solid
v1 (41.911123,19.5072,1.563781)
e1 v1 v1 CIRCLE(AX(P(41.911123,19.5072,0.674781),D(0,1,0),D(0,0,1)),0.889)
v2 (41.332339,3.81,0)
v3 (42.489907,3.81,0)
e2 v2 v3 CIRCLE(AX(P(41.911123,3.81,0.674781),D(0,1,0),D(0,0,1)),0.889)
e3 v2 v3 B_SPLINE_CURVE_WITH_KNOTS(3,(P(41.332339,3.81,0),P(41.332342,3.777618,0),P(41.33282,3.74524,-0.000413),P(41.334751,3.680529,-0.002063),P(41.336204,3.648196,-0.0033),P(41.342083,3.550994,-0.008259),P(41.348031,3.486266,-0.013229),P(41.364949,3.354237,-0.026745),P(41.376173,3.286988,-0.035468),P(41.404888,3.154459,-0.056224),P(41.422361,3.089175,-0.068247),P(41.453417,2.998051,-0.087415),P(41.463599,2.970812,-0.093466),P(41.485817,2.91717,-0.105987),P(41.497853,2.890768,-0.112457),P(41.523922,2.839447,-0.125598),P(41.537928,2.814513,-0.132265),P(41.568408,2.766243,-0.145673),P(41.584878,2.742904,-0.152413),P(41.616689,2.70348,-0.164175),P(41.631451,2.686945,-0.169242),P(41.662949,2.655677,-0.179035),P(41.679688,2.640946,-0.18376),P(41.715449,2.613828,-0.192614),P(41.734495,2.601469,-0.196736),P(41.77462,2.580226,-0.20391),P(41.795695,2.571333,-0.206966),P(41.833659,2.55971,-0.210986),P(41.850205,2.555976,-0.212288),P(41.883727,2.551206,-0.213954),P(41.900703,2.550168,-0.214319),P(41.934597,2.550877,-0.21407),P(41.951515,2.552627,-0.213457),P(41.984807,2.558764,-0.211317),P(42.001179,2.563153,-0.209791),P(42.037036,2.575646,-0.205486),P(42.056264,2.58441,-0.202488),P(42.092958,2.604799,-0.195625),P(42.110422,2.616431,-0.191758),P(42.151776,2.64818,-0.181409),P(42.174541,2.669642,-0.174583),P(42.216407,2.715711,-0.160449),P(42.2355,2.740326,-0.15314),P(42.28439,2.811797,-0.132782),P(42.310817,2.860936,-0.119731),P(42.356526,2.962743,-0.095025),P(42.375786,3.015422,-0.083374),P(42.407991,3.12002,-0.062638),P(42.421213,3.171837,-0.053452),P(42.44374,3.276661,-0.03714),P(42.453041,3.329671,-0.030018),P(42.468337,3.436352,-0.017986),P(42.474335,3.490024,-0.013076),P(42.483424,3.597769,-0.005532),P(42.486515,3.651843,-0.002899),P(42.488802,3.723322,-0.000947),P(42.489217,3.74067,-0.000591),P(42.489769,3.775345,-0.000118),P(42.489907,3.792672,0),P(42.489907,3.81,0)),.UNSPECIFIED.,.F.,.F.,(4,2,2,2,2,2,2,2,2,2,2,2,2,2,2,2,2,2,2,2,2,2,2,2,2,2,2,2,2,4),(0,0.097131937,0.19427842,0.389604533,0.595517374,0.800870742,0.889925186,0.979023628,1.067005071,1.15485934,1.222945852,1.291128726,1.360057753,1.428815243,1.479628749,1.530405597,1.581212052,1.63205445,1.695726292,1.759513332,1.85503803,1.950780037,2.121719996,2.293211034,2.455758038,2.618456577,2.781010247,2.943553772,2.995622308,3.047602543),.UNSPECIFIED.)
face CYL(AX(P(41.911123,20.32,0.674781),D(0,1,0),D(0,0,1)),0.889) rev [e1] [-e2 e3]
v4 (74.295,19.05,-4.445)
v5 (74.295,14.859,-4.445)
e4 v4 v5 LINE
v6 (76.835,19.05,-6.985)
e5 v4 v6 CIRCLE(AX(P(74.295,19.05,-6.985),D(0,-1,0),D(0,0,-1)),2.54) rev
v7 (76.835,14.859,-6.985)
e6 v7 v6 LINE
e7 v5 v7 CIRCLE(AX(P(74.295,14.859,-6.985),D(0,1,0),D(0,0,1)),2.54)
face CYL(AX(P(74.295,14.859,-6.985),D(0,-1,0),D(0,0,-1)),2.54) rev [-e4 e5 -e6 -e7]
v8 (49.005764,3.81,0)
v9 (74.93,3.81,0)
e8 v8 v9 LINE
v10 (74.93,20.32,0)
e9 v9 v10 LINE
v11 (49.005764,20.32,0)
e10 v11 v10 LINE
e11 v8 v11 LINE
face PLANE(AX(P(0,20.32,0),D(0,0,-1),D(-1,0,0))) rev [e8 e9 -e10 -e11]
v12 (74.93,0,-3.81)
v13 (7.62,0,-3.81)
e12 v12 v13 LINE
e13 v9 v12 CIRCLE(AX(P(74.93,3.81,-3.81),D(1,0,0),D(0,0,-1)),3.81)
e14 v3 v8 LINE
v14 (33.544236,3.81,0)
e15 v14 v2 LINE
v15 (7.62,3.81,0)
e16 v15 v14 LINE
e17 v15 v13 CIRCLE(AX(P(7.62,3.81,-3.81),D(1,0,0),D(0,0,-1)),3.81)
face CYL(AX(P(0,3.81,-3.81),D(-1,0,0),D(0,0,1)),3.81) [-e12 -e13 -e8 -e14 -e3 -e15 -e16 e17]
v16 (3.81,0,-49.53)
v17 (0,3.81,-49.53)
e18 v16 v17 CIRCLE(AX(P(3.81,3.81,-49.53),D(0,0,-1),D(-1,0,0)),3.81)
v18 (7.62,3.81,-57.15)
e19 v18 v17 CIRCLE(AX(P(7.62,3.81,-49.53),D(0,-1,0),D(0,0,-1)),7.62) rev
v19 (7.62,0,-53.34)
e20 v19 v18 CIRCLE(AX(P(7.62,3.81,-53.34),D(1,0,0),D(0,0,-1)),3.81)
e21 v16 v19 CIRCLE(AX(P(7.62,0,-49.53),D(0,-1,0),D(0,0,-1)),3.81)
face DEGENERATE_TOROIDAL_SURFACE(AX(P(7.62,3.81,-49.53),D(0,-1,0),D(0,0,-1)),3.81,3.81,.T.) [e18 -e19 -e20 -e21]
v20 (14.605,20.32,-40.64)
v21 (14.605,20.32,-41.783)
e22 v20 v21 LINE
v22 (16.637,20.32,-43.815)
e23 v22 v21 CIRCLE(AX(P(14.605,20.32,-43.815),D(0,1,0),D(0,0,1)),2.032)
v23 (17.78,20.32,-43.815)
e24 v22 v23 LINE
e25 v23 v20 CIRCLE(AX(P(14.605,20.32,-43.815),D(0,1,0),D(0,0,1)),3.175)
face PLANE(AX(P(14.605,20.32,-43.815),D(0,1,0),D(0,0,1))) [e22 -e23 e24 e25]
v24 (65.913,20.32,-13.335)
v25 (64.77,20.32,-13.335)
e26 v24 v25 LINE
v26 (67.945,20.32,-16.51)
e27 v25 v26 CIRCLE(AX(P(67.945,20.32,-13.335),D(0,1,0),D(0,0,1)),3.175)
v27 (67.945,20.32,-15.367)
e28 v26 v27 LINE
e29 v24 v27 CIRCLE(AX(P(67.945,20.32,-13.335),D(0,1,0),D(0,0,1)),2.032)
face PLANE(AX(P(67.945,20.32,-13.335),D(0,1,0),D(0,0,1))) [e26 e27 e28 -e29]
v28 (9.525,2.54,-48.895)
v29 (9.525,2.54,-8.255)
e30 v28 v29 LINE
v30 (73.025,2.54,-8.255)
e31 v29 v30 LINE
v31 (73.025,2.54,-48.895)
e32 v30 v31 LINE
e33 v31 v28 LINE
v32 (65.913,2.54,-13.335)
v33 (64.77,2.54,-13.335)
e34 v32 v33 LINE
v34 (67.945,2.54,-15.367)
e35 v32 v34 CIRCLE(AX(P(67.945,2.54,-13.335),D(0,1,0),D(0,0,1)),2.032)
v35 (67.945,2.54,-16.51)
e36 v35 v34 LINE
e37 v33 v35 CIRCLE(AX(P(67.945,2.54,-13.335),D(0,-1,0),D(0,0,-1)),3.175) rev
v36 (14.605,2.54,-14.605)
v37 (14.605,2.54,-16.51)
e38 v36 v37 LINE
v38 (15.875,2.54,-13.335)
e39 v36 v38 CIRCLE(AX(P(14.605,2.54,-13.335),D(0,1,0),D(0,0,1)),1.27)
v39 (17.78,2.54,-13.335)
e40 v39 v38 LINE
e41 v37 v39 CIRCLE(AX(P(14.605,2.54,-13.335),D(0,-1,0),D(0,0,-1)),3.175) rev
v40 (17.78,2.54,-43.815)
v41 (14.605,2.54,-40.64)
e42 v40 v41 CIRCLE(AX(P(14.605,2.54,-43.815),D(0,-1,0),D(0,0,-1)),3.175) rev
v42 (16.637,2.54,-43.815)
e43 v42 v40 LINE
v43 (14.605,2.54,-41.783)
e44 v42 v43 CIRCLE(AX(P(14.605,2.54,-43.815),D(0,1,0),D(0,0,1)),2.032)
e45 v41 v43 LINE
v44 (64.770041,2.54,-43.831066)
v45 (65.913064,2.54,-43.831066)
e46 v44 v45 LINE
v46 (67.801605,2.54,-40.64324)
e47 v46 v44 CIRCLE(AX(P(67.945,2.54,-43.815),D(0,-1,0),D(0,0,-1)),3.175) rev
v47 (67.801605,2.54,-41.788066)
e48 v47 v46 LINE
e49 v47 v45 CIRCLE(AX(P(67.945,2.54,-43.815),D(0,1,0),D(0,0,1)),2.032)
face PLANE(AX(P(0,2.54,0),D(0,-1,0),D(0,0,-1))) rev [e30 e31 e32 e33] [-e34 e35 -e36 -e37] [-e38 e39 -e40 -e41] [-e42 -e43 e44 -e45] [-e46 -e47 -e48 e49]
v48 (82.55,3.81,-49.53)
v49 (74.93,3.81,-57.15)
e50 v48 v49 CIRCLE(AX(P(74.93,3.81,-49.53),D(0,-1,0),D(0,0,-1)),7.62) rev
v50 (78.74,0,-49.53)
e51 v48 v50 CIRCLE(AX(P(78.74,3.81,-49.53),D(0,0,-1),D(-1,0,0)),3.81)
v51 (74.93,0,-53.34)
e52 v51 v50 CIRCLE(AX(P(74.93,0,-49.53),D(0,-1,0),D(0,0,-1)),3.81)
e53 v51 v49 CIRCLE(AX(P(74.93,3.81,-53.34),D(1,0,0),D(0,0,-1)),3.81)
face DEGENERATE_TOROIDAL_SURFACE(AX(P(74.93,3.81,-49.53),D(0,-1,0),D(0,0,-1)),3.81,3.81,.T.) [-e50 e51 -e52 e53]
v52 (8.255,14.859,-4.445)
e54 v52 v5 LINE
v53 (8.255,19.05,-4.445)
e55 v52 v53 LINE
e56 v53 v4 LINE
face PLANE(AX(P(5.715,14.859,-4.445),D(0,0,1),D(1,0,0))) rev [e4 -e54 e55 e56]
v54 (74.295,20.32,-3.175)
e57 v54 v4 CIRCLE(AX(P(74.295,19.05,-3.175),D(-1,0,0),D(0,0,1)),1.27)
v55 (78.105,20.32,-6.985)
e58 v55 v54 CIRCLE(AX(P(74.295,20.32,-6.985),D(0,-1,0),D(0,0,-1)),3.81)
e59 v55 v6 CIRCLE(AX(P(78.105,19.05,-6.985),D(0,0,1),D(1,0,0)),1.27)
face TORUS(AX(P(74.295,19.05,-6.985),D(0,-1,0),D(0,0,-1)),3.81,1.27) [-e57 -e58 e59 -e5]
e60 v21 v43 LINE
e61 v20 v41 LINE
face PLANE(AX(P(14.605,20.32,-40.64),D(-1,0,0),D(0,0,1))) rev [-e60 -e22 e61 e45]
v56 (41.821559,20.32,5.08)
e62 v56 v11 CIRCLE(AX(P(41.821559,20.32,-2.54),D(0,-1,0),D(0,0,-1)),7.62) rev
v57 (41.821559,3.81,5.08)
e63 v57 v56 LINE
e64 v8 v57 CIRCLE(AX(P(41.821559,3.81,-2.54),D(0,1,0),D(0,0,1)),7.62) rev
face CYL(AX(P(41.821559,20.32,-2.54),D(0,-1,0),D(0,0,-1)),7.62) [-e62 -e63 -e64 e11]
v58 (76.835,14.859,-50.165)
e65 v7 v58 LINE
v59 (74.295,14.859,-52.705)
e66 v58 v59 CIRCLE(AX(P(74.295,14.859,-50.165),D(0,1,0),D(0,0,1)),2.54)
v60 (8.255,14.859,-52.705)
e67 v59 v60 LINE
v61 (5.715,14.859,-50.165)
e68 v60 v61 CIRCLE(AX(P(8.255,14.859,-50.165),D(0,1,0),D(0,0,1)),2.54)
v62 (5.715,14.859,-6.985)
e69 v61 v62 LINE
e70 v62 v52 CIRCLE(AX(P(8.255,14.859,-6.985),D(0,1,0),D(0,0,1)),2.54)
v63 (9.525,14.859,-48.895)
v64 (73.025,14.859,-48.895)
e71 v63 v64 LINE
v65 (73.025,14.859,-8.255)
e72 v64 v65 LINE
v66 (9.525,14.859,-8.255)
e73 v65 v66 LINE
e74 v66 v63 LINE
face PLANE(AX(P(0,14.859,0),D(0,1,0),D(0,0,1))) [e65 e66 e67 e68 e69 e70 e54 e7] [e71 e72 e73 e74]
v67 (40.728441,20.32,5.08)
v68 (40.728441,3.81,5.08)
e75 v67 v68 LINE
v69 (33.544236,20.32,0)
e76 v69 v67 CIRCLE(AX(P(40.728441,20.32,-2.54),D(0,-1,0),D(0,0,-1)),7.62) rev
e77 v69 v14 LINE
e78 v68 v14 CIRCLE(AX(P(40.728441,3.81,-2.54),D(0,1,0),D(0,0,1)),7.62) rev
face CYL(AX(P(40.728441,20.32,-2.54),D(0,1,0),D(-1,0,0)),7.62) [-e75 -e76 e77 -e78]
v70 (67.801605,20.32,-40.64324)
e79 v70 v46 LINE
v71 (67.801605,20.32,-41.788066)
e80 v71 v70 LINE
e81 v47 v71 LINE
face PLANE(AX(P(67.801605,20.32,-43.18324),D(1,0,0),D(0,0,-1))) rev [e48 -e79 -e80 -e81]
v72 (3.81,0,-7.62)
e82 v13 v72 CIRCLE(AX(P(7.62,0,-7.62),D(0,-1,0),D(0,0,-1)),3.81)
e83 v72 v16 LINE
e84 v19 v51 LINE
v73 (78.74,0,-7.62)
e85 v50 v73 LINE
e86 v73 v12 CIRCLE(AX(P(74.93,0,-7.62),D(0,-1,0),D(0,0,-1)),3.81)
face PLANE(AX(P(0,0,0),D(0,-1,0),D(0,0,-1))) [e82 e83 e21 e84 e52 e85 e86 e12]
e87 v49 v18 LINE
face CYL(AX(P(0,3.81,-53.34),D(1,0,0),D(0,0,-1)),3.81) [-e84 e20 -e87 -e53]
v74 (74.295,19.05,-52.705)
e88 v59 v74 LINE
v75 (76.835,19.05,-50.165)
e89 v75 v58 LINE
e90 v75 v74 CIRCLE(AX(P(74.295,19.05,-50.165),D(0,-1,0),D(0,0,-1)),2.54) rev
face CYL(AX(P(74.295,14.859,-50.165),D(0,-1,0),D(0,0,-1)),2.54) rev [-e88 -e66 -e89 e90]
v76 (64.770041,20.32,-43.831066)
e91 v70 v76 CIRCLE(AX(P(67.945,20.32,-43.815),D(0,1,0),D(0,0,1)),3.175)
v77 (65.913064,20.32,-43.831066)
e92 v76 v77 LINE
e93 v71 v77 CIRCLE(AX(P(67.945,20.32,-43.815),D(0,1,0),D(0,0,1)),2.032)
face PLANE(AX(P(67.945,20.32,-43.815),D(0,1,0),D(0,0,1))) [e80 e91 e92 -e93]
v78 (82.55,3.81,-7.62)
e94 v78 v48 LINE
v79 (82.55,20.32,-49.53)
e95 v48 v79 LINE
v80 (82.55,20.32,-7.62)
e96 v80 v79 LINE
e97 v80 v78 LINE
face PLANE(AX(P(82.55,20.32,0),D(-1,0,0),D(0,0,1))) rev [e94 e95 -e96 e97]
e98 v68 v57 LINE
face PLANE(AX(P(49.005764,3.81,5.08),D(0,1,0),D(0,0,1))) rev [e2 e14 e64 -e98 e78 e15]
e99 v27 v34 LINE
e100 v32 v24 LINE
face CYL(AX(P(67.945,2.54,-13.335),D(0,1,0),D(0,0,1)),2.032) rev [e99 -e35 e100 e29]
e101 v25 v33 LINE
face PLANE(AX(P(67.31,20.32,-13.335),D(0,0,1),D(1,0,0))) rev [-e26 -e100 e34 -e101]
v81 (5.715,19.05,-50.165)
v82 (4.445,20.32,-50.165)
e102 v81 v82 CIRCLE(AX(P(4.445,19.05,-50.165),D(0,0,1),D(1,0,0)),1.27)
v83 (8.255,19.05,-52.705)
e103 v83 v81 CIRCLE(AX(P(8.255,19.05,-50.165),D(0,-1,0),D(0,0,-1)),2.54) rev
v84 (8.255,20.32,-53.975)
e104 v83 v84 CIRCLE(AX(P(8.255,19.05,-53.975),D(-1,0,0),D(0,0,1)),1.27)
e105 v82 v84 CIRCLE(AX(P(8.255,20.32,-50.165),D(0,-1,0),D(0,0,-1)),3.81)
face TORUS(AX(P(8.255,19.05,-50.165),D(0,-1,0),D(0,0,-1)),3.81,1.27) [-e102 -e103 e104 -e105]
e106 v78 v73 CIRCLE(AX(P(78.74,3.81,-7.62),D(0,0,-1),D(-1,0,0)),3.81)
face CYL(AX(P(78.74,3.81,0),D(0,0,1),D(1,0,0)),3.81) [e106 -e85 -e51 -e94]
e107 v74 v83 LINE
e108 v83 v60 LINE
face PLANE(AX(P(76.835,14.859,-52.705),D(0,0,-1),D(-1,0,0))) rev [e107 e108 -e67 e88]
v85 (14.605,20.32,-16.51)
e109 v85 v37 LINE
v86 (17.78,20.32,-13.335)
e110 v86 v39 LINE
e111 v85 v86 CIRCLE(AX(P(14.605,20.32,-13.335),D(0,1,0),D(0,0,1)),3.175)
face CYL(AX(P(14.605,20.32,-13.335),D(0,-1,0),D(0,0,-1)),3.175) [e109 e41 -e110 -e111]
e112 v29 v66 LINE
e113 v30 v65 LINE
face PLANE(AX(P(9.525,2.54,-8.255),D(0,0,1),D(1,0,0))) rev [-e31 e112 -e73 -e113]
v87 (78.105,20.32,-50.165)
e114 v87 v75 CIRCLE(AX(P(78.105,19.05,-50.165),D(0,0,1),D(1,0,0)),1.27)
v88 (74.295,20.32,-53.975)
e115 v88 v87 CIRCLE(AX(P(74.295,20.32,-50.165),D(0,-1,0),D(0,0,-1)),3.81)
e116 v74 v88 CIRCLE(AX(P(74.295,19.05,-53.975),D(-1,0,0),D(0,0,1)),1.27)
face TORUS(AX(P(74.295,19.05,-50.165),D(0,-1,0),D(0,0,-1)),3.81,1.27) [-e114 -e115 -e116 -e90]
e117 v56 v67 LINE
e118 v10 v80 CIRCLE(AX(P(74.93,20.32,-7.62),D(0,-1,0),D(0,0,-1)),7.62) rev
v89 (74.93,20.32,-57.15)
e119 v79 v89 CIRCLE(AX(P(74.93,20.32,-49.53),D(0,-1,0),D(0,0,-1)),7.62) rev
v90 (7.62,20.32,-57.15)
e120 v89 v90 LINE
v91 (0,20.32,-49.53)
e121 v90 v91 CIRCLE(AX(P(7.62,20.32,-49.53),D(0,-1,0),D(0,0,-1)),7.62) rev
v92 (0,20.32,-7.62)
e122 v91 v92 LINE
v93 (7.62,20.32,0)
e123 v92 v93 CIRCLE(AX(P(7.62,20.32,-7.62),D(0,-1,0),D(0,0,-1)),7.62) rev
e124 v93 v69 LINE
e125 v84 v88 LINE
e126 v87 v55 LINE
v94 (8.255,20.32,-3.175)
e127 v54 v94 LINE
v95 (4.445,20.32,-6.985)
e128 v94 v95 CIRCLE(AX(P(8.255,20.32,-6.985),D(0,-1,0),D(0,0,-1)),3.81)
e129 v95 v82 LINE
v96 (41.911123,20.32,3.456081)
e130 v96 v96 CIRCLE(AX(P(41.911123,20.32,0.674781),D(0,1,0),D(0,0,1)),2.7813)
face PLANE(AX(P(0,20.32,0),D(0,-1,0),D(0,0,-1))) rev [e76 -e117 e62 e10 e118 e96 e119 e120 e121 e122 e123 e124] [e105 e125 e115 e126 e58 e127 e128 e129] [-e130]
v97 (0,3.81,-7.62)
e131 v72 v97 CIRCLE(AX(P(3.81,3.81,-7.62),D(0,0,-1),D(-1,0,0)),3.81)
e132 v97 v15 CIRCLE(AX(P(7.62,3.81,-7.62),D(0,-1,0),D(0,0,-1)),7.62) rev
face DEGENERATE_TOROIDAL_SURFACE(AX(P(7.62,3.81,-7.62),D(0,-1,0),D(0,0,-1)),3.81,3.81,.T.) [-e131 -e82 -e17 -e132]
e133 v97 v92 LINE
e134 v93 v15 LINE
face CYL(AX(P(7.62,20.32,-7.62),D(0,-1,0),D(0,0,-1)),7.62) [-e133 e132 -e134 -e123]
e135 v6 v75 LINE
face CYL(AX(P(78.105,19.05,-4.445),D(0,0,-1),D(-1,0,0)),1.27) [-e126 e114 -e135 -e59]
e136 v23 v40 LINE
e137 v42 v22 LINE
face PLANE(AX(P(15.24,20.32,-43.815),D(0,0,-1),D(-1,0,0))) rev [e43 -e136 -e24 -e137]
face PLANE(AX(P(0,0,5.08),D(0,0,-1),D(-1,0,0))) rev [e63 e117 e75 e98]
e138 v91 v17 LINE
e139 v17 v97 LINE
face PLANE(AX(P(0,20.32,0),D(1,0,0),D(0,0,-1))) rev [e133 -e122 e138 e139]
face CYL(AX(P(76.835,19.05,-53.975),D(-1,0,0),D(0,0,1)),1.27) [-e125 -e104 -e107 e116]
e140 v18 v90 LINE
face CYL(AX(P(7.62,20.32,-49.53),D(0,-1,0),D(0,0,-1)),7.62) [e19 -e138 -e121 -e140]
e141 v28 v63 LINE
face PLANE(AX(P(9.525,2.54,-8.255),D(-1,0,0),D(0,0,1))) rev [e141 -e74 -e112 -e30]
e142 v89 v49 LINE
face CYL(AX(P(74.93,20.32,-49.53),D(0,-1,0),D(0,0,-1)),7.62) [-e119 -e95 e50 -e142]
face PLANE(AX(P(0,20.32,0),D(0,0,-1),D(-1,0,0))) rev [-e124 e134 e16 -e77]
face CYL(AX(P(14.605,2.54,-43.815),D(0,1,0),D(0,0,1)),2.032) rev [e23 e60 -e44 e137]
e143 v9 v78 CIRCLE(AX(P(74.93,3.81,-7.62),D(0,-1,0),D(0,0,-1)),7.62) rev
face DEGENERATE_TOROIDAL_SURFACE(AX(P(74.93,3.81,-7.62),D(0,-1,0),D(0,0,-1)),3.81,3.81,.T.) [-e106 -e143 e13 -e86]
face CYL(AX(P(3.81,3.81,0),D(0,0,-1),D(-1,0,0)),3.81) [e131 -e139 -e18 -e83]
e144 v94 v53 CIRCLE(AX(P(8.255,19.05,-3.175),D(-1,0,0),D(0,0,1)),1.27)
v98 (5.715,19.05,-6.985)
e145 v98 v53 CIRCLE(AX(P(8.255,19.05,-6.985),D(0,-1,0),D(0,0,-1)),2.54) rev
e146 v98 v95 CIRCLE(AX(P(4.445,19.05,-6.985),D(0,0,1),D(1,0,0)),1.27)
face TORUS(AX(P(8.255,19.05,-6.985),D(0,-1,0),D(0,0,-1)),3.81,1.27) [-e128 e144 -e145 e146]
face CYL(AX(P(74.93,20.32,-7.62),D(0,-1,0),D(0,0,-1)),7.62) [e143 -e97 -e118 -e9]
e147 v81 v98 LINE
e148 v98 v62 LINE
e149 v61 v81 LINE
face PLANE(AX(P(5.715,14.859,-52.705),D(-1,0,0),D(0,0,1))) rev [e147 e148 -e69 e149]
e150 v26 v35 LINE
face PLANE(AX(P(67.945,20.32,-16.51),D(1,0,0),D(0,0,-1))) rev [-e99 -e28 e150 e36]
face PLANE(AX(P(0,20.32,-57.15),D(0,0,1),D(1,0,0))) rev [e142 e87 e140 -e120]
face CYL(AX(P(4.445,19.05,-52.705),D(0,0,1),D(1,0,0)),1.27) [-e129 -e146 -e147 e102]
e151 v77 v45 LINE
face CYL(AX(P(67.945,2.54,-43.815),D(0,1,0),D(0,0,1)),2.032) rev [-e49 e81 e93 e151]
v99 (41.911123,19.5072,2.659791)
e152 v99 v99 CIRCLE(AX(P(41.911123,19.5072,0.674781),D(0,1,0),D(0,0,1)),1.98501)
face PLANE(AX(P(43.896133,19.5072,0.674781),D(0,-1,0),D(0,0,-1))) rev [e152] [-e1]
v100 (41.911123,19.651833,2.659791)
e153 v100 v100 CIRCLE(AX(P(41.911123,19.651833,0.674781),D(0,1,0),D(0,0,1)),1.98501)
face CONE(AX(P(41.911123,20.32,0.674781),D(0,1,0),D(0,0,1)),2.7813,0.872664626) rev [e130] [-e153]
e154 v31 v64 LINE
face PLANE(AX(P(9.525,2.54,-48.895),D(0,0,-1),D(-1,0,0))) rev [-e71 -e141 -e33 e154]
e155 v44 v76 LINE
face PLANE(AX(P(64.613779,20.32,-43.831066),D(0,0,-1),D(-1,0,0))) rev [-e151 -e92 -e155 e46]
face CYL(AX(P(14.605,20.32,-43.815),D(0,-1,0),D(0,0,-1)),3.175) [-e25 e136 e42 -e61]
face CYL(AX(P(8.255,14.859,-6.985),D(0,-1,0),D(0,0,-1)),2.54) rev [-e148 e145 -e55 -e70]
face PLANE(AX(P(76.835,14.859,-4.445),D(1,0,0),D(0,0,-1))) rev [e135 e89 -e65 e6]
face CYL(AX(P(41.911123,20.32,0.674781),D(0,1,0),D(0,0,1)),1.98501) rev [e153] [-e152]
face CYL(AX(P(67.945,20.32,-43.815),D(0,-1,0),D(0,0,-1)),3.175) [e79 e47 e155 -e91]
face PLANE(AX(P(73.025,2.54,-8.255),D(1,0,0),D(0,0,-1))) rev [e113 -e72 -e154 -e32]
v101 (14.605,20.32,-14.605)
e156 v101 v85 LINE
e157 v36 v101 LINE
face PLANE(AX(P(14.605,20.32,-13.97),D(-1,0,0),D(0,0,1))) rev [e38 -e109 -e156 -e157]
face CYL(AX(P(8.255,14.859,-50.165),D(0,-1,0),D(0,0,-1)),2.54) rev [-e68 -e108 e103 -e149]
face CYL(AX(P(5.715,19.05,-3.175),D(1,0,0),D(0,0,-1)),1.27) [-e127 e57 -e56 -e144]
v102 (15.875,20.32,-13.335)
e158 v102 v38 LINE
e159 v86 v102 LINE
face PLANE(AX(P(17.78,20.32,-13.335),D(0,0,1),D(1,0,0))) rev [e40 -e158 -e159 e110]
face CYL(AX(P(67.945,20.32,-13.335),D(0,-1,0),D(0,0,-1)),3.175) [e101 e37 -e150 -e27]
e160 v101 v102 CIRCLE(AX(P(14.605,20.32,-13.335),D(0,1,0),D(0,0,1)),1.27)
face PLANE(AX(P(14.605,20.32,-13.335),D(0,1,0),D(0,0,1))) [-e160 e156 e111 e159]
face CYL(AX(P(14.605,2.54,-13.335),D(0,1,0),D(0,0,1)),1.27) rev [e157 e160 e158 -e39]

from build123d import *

# Parameters (mm, degrees)
SKETCH1_W               = 82.55
SKETCH1_H               = 57.15
BOSS_EXTRUDE1_DEPTH     = 20.32
FILLET2_R               = 7.62
FILLET3_R               = 3.81
SKETCH2_W               = 63.5
SKETCH2_H               = 40.64
CUT_EXTRUDE1_DEPTH      = 17.78
SKETCH9_W               = 15.46152766
SKETCH9_H               = 16.51
BOSS_EXTRUDE5_DEPTH     = 5.08
FILLET10_R              = 7.62
SKETCH7_W               = 71.12
SKETCH7_H               = 48.26
CUT_EXTRUDE4_DEPTH      = 5.461
FILLET12_R              = 2.54
FILLET13_R              = 1.27
SKETCH5_R               = 3.175
BOSS_EXTRUDE6_DEPTH     = 17.78
SKETCH11_R              = 1.27
SKETCH11_R_2            = 2.032
CUT_EXTRUDE5_DEPTH      = 17.78
CUT_EXTRUDE_THIN1_DEPTH = 102.964471319


with BuildPart() as part:
    # Sketch1 → Boss-Extrude1 (new body)
    with BuildSketch(Plane(origin=(0, 0, 0), x_dir=(1, 0, 0), z_dir=(0, 1, 0))):
        with Locations((41.275, 28.575)):
            Rectangle(SKETCH1_W, SKETCH1_H)
    extrude(amount=BOSS_EXTRUDE1_DEPTH)

    # Fillet2
    fillet2_edges = [part.edges().sort_by_distance(p)[0] for p in [
        (0, 10.16, -57.15),
        (82.55, 10.16, -57.15),
        (82.55, 10.16, 0),
        (0, 10.16, 0),
    ]]
    fillet(fillet2_edges, radius=FILLET2_R)

    # Fillet3
    fillet3_edges = [part.edges().sort_by_distance(p)[0] for p in [
        (41.275, 0, -57.15),
        (0, 0, -28.575),
        (82.55, 0, -28.575),
        (41.275, 0, 0),
        (2.231846327, 0, -54.918153673),
        (2.231846327, 0, -2.231846327),
        (80.318153673, 0, -2.231846327),
        (80.318153673, 0, -54.918153673),
    ]]
    fillet(fillet3_edges, radius=FILLET3_R)

    # Sketch2 → Cut-Extrude1 (cut)
    with BuildSketch(Plane(origin=(0, 20.32, 0), x_dir=(1, 0, 0), z_dir=(0, 1, 0))):
        with Locations((41.275, 28.575)):
            Rectangle(SKETCH2_W, SKETCH2_H)
    extrude(amount=-CUT_EXTRUDE1_DEPTH, mode=Mode.SUBTRACT)

    # Sketch9 → Boss-Extrude5 (add)
    with BuildSketch(Plane.XY):
        with Locations((41.275, 12.065)):
            Rectangle(SKETCH9_W, SKETCH9_H)
    extrude(amount=BOSS_EXTRUDE5_DEPTH)

    # Fillet10
    # the kernel refuses this fillet: 7.62 mm, written as the material it takes off along each edge
    with BuildSketch(Plane(origin=(49.00576383, -14.150512242, 5.08), x_dir=(-1, 0, 0), z_dir=(0, 1, 0))) as fillet10_piece_1:
        with BuildLine():
            CenterArc((7.184204897, -7.62), FILLET10_R, 90, 70.528779366)
            Line((0, -5.08), (-0.143684098, -5.0292))
            ThreePointArc((-0.143684098, -5.0292), (-0.1524, -2.54), (-0.1524, 0))
            Line((-0.1524, 0), (0, 0.1524))
            Line((0, 0.1524), (7.184204897, 0.1524))
            Line((7.184204897, 0.1524), (7.184204897, 0))
        make_face()
    extrude(amount=52.431024484, mode=Mode.SUBTRACT)
    with BuildSketch(Plane(origin=(33.54423617, 38.280512242, 5.08), x_dir=(0, 0, -1), z_dir=(0, -1, 0))) as fillet10_piece_2:
        with BuildLine():
            CenterArc((7.62, 7.184204897), FILLET10_R, 180, 70.528779366)
            Line((0, 7.184204897), (-0.1524, 7.184204897))
            Line((-0.1524, 7.184204897), (-0.1524, 0))
            Line((-0.1524, 0), (0, -0.1524))
            ThreePointArc((0, -0.1524), (2.54, -0.1524), (5.0292, -0.143684098))
            Line((5.0292, -0.143684098), (5.08, 0))
        make_face()
    extrude(amount=52.431024484, mode=Mode.SUBTRACT)

    # Sketch7 → Cut-Extrude4 (cut)
    with BuildSketch(Plane(origin=(0, 20.32, 0), x_dir=(1, 0, 0), z_dir=(0, 1, 0))):
        with Locations((41.275, 28.575)):
            Rectangle(SKETCH7_W, SKETCH7_H)
    extrude(amount=-CUT_EXTRUDE4_DEPTH, mode=Mode.SUBTRACT)

    # Fillet12
    fillet12_edges = [part.edges().sort_by_distance(p)[0] for p in [
        (5.715, 17.5895, -52.705),
        (76.835, 17.5895, -52.705),
        (76.835, 17.5895, -4.445),
        (5.715, 17.5895, -4.445),
    ]]
    fillet(fillet12_edges, radius=FILLET12_R)

    # Fillet13
    fillet13_edges = [part.edges().sort_by_distance(p)[0] for p in [
        (41.275, 20.32, -52.705),
        (76.835, 20.32, -28.575),
        (41.275, 20.32, -4.445),
        (5.715, 20.32, -28.575),
        (76.091051224, 20.32, -51.961051224),
        (76.091051224, 20.32, -5.188948776),
        (6.458948776, 20.32, -51.961051224),
        (6.458948776, 20.32, -5.188948776),
    ]]
    fillet(fillet13_edges, radius=FILLET13_R)

    # Sketch5 → Boss-Extrude6 (add)
    with BuildSketch(Plane(origin=(0, 2.54, 0), x_dir=(1, 0, 0), z_dir=(0, 1, 0))):
        with Locations(Location((14.605, 43.815, 0), (0, 0, 90))):
            Circle(SKETCH5_R)
        with Locations(Location((14.605, 13.335, 0), (0, 0, 90))):
            Circle(SKETCH5_R)
        with Locations(Location((67.945, 43.815, 0), (0, 0, 90))):
            Circle(SKETCH5_R)
        with Locations(Location((67.945, 13.335, 0), (0, 0, 90))):
            Circle(SKETCH5_R)
    extrude(amount=BOSS_EXTRUDE6_DEPTH)

    # Sketch11 → Cut-Extrude5 (cut)
    with BuildSketch(Plane(origin=(0, 20.32, 0), x_dir=(1, 0, 0), z_dir=(0, 1, 0))):
        with Locations(Location((14.605, 13.335, 0), (0, 0, 270))):
            Circle(SKETCH11_R)
        with Locations(Location((14.605, 43.815, 0), (0, 0, 270))):
            Circle(SKETCH11_R_2)
        with Locations(Location((67.945, 13.335, 0), (0, 0, 270))):
            Circle(SKETCH11_R_2)
        with Locations(Location((67.945, 43.815, 0), (0, 0, 270))):
            Circle(SKETCH11_R_2)
    extrude(amount=-CUT_EXTRUDE5_DEPTH, mode=Mode.SUBTRACT)

    # Sketch17 → Cut-Extrude-Thin1 (cut, through all)
    with BuildSketch(Plane(origin=(0, 2.54, 0), x_dir=(1, 0, 0), z_dir=(0, 1, 0))):
        with BuildLine():
            ThreePointArc((67.801605081, 40.643239779), (65.547471879, 41.576932323), (64.613779335, 43.831065525))
            Line((64.613779335, 43.831065525), (67.153779335, 43.831065525))
            ThreePointArc((67.153779335, 43.831065525), (67.343523103, 43.372983547), (67.801605081, 43.183239779))
            Line((67.801605081, 43.183239779), (67.801605081, 40.643239779))
        make_face()
        with BuildLine():
            ThreePointArc((64.77, 13.335), (65.69993597, 15.58006403), (67.945, 16.51))
            Line((67.945, 16.51), (67.945, 13.97))
            ThreePointArc((67.945, 13.97), (67.495987194, 13.784012806), (67.31, 13.335))
            Line((67.31, 13.335), (64.77, 13.335))
        make_face()
        with BuildLine():
            ThreePointArc((17.78, 43.815), (16.85006403, 41.56993597), (14.605, 40.64))
            Line((14.605, 40.64), (14.605, 43.18))
            ThreePointArc((14.605, 43.18), (15.054012806, 43.365987194), (15.24, 43.815))
            Line((15.24, 43.815), (17.78, 43.815))
        make_face()
        with BuildLine():
            ThreePointArc((14.605, 16.51), (16.85006403, 15.58006403), (17.78, 13.335))
            Line((17.78, 13.335), (15.24, 13.335))
            ThreePointArc((15.24, 13.335), (15.054012806, 13.784012806), (14.605, 13.97))
            Line((14.605, 13.97), (14.605, 16.51))
        make_face()
    extrude(amount=CUT_EXTRUDE_THIN1_DEPTH, mode=Mode.SUBTRACT)

    # Sketch19 → CBORE for #0 Binding Head Machine Screw1 (revolve, cut)
    with BuildSketch(Plane(origin=(41.911122971, 20.32, 0.674781491), x_dir=(0, 0, 1), z_dir=(1, 0, 0))):
        Polygon((0, 0), (0, 20.32), (0.889, 20.32), (0.889, 0.8128), (1.98501, 0.8128), (1.98501, 0.668166645), (2.7813, 0), align=None)
    revolve(axis=Axis((41.911122971, 26.67, 0.674781491), (0, -1, 0)), mode=Mode.SUBTRACT)


solid = part.part
